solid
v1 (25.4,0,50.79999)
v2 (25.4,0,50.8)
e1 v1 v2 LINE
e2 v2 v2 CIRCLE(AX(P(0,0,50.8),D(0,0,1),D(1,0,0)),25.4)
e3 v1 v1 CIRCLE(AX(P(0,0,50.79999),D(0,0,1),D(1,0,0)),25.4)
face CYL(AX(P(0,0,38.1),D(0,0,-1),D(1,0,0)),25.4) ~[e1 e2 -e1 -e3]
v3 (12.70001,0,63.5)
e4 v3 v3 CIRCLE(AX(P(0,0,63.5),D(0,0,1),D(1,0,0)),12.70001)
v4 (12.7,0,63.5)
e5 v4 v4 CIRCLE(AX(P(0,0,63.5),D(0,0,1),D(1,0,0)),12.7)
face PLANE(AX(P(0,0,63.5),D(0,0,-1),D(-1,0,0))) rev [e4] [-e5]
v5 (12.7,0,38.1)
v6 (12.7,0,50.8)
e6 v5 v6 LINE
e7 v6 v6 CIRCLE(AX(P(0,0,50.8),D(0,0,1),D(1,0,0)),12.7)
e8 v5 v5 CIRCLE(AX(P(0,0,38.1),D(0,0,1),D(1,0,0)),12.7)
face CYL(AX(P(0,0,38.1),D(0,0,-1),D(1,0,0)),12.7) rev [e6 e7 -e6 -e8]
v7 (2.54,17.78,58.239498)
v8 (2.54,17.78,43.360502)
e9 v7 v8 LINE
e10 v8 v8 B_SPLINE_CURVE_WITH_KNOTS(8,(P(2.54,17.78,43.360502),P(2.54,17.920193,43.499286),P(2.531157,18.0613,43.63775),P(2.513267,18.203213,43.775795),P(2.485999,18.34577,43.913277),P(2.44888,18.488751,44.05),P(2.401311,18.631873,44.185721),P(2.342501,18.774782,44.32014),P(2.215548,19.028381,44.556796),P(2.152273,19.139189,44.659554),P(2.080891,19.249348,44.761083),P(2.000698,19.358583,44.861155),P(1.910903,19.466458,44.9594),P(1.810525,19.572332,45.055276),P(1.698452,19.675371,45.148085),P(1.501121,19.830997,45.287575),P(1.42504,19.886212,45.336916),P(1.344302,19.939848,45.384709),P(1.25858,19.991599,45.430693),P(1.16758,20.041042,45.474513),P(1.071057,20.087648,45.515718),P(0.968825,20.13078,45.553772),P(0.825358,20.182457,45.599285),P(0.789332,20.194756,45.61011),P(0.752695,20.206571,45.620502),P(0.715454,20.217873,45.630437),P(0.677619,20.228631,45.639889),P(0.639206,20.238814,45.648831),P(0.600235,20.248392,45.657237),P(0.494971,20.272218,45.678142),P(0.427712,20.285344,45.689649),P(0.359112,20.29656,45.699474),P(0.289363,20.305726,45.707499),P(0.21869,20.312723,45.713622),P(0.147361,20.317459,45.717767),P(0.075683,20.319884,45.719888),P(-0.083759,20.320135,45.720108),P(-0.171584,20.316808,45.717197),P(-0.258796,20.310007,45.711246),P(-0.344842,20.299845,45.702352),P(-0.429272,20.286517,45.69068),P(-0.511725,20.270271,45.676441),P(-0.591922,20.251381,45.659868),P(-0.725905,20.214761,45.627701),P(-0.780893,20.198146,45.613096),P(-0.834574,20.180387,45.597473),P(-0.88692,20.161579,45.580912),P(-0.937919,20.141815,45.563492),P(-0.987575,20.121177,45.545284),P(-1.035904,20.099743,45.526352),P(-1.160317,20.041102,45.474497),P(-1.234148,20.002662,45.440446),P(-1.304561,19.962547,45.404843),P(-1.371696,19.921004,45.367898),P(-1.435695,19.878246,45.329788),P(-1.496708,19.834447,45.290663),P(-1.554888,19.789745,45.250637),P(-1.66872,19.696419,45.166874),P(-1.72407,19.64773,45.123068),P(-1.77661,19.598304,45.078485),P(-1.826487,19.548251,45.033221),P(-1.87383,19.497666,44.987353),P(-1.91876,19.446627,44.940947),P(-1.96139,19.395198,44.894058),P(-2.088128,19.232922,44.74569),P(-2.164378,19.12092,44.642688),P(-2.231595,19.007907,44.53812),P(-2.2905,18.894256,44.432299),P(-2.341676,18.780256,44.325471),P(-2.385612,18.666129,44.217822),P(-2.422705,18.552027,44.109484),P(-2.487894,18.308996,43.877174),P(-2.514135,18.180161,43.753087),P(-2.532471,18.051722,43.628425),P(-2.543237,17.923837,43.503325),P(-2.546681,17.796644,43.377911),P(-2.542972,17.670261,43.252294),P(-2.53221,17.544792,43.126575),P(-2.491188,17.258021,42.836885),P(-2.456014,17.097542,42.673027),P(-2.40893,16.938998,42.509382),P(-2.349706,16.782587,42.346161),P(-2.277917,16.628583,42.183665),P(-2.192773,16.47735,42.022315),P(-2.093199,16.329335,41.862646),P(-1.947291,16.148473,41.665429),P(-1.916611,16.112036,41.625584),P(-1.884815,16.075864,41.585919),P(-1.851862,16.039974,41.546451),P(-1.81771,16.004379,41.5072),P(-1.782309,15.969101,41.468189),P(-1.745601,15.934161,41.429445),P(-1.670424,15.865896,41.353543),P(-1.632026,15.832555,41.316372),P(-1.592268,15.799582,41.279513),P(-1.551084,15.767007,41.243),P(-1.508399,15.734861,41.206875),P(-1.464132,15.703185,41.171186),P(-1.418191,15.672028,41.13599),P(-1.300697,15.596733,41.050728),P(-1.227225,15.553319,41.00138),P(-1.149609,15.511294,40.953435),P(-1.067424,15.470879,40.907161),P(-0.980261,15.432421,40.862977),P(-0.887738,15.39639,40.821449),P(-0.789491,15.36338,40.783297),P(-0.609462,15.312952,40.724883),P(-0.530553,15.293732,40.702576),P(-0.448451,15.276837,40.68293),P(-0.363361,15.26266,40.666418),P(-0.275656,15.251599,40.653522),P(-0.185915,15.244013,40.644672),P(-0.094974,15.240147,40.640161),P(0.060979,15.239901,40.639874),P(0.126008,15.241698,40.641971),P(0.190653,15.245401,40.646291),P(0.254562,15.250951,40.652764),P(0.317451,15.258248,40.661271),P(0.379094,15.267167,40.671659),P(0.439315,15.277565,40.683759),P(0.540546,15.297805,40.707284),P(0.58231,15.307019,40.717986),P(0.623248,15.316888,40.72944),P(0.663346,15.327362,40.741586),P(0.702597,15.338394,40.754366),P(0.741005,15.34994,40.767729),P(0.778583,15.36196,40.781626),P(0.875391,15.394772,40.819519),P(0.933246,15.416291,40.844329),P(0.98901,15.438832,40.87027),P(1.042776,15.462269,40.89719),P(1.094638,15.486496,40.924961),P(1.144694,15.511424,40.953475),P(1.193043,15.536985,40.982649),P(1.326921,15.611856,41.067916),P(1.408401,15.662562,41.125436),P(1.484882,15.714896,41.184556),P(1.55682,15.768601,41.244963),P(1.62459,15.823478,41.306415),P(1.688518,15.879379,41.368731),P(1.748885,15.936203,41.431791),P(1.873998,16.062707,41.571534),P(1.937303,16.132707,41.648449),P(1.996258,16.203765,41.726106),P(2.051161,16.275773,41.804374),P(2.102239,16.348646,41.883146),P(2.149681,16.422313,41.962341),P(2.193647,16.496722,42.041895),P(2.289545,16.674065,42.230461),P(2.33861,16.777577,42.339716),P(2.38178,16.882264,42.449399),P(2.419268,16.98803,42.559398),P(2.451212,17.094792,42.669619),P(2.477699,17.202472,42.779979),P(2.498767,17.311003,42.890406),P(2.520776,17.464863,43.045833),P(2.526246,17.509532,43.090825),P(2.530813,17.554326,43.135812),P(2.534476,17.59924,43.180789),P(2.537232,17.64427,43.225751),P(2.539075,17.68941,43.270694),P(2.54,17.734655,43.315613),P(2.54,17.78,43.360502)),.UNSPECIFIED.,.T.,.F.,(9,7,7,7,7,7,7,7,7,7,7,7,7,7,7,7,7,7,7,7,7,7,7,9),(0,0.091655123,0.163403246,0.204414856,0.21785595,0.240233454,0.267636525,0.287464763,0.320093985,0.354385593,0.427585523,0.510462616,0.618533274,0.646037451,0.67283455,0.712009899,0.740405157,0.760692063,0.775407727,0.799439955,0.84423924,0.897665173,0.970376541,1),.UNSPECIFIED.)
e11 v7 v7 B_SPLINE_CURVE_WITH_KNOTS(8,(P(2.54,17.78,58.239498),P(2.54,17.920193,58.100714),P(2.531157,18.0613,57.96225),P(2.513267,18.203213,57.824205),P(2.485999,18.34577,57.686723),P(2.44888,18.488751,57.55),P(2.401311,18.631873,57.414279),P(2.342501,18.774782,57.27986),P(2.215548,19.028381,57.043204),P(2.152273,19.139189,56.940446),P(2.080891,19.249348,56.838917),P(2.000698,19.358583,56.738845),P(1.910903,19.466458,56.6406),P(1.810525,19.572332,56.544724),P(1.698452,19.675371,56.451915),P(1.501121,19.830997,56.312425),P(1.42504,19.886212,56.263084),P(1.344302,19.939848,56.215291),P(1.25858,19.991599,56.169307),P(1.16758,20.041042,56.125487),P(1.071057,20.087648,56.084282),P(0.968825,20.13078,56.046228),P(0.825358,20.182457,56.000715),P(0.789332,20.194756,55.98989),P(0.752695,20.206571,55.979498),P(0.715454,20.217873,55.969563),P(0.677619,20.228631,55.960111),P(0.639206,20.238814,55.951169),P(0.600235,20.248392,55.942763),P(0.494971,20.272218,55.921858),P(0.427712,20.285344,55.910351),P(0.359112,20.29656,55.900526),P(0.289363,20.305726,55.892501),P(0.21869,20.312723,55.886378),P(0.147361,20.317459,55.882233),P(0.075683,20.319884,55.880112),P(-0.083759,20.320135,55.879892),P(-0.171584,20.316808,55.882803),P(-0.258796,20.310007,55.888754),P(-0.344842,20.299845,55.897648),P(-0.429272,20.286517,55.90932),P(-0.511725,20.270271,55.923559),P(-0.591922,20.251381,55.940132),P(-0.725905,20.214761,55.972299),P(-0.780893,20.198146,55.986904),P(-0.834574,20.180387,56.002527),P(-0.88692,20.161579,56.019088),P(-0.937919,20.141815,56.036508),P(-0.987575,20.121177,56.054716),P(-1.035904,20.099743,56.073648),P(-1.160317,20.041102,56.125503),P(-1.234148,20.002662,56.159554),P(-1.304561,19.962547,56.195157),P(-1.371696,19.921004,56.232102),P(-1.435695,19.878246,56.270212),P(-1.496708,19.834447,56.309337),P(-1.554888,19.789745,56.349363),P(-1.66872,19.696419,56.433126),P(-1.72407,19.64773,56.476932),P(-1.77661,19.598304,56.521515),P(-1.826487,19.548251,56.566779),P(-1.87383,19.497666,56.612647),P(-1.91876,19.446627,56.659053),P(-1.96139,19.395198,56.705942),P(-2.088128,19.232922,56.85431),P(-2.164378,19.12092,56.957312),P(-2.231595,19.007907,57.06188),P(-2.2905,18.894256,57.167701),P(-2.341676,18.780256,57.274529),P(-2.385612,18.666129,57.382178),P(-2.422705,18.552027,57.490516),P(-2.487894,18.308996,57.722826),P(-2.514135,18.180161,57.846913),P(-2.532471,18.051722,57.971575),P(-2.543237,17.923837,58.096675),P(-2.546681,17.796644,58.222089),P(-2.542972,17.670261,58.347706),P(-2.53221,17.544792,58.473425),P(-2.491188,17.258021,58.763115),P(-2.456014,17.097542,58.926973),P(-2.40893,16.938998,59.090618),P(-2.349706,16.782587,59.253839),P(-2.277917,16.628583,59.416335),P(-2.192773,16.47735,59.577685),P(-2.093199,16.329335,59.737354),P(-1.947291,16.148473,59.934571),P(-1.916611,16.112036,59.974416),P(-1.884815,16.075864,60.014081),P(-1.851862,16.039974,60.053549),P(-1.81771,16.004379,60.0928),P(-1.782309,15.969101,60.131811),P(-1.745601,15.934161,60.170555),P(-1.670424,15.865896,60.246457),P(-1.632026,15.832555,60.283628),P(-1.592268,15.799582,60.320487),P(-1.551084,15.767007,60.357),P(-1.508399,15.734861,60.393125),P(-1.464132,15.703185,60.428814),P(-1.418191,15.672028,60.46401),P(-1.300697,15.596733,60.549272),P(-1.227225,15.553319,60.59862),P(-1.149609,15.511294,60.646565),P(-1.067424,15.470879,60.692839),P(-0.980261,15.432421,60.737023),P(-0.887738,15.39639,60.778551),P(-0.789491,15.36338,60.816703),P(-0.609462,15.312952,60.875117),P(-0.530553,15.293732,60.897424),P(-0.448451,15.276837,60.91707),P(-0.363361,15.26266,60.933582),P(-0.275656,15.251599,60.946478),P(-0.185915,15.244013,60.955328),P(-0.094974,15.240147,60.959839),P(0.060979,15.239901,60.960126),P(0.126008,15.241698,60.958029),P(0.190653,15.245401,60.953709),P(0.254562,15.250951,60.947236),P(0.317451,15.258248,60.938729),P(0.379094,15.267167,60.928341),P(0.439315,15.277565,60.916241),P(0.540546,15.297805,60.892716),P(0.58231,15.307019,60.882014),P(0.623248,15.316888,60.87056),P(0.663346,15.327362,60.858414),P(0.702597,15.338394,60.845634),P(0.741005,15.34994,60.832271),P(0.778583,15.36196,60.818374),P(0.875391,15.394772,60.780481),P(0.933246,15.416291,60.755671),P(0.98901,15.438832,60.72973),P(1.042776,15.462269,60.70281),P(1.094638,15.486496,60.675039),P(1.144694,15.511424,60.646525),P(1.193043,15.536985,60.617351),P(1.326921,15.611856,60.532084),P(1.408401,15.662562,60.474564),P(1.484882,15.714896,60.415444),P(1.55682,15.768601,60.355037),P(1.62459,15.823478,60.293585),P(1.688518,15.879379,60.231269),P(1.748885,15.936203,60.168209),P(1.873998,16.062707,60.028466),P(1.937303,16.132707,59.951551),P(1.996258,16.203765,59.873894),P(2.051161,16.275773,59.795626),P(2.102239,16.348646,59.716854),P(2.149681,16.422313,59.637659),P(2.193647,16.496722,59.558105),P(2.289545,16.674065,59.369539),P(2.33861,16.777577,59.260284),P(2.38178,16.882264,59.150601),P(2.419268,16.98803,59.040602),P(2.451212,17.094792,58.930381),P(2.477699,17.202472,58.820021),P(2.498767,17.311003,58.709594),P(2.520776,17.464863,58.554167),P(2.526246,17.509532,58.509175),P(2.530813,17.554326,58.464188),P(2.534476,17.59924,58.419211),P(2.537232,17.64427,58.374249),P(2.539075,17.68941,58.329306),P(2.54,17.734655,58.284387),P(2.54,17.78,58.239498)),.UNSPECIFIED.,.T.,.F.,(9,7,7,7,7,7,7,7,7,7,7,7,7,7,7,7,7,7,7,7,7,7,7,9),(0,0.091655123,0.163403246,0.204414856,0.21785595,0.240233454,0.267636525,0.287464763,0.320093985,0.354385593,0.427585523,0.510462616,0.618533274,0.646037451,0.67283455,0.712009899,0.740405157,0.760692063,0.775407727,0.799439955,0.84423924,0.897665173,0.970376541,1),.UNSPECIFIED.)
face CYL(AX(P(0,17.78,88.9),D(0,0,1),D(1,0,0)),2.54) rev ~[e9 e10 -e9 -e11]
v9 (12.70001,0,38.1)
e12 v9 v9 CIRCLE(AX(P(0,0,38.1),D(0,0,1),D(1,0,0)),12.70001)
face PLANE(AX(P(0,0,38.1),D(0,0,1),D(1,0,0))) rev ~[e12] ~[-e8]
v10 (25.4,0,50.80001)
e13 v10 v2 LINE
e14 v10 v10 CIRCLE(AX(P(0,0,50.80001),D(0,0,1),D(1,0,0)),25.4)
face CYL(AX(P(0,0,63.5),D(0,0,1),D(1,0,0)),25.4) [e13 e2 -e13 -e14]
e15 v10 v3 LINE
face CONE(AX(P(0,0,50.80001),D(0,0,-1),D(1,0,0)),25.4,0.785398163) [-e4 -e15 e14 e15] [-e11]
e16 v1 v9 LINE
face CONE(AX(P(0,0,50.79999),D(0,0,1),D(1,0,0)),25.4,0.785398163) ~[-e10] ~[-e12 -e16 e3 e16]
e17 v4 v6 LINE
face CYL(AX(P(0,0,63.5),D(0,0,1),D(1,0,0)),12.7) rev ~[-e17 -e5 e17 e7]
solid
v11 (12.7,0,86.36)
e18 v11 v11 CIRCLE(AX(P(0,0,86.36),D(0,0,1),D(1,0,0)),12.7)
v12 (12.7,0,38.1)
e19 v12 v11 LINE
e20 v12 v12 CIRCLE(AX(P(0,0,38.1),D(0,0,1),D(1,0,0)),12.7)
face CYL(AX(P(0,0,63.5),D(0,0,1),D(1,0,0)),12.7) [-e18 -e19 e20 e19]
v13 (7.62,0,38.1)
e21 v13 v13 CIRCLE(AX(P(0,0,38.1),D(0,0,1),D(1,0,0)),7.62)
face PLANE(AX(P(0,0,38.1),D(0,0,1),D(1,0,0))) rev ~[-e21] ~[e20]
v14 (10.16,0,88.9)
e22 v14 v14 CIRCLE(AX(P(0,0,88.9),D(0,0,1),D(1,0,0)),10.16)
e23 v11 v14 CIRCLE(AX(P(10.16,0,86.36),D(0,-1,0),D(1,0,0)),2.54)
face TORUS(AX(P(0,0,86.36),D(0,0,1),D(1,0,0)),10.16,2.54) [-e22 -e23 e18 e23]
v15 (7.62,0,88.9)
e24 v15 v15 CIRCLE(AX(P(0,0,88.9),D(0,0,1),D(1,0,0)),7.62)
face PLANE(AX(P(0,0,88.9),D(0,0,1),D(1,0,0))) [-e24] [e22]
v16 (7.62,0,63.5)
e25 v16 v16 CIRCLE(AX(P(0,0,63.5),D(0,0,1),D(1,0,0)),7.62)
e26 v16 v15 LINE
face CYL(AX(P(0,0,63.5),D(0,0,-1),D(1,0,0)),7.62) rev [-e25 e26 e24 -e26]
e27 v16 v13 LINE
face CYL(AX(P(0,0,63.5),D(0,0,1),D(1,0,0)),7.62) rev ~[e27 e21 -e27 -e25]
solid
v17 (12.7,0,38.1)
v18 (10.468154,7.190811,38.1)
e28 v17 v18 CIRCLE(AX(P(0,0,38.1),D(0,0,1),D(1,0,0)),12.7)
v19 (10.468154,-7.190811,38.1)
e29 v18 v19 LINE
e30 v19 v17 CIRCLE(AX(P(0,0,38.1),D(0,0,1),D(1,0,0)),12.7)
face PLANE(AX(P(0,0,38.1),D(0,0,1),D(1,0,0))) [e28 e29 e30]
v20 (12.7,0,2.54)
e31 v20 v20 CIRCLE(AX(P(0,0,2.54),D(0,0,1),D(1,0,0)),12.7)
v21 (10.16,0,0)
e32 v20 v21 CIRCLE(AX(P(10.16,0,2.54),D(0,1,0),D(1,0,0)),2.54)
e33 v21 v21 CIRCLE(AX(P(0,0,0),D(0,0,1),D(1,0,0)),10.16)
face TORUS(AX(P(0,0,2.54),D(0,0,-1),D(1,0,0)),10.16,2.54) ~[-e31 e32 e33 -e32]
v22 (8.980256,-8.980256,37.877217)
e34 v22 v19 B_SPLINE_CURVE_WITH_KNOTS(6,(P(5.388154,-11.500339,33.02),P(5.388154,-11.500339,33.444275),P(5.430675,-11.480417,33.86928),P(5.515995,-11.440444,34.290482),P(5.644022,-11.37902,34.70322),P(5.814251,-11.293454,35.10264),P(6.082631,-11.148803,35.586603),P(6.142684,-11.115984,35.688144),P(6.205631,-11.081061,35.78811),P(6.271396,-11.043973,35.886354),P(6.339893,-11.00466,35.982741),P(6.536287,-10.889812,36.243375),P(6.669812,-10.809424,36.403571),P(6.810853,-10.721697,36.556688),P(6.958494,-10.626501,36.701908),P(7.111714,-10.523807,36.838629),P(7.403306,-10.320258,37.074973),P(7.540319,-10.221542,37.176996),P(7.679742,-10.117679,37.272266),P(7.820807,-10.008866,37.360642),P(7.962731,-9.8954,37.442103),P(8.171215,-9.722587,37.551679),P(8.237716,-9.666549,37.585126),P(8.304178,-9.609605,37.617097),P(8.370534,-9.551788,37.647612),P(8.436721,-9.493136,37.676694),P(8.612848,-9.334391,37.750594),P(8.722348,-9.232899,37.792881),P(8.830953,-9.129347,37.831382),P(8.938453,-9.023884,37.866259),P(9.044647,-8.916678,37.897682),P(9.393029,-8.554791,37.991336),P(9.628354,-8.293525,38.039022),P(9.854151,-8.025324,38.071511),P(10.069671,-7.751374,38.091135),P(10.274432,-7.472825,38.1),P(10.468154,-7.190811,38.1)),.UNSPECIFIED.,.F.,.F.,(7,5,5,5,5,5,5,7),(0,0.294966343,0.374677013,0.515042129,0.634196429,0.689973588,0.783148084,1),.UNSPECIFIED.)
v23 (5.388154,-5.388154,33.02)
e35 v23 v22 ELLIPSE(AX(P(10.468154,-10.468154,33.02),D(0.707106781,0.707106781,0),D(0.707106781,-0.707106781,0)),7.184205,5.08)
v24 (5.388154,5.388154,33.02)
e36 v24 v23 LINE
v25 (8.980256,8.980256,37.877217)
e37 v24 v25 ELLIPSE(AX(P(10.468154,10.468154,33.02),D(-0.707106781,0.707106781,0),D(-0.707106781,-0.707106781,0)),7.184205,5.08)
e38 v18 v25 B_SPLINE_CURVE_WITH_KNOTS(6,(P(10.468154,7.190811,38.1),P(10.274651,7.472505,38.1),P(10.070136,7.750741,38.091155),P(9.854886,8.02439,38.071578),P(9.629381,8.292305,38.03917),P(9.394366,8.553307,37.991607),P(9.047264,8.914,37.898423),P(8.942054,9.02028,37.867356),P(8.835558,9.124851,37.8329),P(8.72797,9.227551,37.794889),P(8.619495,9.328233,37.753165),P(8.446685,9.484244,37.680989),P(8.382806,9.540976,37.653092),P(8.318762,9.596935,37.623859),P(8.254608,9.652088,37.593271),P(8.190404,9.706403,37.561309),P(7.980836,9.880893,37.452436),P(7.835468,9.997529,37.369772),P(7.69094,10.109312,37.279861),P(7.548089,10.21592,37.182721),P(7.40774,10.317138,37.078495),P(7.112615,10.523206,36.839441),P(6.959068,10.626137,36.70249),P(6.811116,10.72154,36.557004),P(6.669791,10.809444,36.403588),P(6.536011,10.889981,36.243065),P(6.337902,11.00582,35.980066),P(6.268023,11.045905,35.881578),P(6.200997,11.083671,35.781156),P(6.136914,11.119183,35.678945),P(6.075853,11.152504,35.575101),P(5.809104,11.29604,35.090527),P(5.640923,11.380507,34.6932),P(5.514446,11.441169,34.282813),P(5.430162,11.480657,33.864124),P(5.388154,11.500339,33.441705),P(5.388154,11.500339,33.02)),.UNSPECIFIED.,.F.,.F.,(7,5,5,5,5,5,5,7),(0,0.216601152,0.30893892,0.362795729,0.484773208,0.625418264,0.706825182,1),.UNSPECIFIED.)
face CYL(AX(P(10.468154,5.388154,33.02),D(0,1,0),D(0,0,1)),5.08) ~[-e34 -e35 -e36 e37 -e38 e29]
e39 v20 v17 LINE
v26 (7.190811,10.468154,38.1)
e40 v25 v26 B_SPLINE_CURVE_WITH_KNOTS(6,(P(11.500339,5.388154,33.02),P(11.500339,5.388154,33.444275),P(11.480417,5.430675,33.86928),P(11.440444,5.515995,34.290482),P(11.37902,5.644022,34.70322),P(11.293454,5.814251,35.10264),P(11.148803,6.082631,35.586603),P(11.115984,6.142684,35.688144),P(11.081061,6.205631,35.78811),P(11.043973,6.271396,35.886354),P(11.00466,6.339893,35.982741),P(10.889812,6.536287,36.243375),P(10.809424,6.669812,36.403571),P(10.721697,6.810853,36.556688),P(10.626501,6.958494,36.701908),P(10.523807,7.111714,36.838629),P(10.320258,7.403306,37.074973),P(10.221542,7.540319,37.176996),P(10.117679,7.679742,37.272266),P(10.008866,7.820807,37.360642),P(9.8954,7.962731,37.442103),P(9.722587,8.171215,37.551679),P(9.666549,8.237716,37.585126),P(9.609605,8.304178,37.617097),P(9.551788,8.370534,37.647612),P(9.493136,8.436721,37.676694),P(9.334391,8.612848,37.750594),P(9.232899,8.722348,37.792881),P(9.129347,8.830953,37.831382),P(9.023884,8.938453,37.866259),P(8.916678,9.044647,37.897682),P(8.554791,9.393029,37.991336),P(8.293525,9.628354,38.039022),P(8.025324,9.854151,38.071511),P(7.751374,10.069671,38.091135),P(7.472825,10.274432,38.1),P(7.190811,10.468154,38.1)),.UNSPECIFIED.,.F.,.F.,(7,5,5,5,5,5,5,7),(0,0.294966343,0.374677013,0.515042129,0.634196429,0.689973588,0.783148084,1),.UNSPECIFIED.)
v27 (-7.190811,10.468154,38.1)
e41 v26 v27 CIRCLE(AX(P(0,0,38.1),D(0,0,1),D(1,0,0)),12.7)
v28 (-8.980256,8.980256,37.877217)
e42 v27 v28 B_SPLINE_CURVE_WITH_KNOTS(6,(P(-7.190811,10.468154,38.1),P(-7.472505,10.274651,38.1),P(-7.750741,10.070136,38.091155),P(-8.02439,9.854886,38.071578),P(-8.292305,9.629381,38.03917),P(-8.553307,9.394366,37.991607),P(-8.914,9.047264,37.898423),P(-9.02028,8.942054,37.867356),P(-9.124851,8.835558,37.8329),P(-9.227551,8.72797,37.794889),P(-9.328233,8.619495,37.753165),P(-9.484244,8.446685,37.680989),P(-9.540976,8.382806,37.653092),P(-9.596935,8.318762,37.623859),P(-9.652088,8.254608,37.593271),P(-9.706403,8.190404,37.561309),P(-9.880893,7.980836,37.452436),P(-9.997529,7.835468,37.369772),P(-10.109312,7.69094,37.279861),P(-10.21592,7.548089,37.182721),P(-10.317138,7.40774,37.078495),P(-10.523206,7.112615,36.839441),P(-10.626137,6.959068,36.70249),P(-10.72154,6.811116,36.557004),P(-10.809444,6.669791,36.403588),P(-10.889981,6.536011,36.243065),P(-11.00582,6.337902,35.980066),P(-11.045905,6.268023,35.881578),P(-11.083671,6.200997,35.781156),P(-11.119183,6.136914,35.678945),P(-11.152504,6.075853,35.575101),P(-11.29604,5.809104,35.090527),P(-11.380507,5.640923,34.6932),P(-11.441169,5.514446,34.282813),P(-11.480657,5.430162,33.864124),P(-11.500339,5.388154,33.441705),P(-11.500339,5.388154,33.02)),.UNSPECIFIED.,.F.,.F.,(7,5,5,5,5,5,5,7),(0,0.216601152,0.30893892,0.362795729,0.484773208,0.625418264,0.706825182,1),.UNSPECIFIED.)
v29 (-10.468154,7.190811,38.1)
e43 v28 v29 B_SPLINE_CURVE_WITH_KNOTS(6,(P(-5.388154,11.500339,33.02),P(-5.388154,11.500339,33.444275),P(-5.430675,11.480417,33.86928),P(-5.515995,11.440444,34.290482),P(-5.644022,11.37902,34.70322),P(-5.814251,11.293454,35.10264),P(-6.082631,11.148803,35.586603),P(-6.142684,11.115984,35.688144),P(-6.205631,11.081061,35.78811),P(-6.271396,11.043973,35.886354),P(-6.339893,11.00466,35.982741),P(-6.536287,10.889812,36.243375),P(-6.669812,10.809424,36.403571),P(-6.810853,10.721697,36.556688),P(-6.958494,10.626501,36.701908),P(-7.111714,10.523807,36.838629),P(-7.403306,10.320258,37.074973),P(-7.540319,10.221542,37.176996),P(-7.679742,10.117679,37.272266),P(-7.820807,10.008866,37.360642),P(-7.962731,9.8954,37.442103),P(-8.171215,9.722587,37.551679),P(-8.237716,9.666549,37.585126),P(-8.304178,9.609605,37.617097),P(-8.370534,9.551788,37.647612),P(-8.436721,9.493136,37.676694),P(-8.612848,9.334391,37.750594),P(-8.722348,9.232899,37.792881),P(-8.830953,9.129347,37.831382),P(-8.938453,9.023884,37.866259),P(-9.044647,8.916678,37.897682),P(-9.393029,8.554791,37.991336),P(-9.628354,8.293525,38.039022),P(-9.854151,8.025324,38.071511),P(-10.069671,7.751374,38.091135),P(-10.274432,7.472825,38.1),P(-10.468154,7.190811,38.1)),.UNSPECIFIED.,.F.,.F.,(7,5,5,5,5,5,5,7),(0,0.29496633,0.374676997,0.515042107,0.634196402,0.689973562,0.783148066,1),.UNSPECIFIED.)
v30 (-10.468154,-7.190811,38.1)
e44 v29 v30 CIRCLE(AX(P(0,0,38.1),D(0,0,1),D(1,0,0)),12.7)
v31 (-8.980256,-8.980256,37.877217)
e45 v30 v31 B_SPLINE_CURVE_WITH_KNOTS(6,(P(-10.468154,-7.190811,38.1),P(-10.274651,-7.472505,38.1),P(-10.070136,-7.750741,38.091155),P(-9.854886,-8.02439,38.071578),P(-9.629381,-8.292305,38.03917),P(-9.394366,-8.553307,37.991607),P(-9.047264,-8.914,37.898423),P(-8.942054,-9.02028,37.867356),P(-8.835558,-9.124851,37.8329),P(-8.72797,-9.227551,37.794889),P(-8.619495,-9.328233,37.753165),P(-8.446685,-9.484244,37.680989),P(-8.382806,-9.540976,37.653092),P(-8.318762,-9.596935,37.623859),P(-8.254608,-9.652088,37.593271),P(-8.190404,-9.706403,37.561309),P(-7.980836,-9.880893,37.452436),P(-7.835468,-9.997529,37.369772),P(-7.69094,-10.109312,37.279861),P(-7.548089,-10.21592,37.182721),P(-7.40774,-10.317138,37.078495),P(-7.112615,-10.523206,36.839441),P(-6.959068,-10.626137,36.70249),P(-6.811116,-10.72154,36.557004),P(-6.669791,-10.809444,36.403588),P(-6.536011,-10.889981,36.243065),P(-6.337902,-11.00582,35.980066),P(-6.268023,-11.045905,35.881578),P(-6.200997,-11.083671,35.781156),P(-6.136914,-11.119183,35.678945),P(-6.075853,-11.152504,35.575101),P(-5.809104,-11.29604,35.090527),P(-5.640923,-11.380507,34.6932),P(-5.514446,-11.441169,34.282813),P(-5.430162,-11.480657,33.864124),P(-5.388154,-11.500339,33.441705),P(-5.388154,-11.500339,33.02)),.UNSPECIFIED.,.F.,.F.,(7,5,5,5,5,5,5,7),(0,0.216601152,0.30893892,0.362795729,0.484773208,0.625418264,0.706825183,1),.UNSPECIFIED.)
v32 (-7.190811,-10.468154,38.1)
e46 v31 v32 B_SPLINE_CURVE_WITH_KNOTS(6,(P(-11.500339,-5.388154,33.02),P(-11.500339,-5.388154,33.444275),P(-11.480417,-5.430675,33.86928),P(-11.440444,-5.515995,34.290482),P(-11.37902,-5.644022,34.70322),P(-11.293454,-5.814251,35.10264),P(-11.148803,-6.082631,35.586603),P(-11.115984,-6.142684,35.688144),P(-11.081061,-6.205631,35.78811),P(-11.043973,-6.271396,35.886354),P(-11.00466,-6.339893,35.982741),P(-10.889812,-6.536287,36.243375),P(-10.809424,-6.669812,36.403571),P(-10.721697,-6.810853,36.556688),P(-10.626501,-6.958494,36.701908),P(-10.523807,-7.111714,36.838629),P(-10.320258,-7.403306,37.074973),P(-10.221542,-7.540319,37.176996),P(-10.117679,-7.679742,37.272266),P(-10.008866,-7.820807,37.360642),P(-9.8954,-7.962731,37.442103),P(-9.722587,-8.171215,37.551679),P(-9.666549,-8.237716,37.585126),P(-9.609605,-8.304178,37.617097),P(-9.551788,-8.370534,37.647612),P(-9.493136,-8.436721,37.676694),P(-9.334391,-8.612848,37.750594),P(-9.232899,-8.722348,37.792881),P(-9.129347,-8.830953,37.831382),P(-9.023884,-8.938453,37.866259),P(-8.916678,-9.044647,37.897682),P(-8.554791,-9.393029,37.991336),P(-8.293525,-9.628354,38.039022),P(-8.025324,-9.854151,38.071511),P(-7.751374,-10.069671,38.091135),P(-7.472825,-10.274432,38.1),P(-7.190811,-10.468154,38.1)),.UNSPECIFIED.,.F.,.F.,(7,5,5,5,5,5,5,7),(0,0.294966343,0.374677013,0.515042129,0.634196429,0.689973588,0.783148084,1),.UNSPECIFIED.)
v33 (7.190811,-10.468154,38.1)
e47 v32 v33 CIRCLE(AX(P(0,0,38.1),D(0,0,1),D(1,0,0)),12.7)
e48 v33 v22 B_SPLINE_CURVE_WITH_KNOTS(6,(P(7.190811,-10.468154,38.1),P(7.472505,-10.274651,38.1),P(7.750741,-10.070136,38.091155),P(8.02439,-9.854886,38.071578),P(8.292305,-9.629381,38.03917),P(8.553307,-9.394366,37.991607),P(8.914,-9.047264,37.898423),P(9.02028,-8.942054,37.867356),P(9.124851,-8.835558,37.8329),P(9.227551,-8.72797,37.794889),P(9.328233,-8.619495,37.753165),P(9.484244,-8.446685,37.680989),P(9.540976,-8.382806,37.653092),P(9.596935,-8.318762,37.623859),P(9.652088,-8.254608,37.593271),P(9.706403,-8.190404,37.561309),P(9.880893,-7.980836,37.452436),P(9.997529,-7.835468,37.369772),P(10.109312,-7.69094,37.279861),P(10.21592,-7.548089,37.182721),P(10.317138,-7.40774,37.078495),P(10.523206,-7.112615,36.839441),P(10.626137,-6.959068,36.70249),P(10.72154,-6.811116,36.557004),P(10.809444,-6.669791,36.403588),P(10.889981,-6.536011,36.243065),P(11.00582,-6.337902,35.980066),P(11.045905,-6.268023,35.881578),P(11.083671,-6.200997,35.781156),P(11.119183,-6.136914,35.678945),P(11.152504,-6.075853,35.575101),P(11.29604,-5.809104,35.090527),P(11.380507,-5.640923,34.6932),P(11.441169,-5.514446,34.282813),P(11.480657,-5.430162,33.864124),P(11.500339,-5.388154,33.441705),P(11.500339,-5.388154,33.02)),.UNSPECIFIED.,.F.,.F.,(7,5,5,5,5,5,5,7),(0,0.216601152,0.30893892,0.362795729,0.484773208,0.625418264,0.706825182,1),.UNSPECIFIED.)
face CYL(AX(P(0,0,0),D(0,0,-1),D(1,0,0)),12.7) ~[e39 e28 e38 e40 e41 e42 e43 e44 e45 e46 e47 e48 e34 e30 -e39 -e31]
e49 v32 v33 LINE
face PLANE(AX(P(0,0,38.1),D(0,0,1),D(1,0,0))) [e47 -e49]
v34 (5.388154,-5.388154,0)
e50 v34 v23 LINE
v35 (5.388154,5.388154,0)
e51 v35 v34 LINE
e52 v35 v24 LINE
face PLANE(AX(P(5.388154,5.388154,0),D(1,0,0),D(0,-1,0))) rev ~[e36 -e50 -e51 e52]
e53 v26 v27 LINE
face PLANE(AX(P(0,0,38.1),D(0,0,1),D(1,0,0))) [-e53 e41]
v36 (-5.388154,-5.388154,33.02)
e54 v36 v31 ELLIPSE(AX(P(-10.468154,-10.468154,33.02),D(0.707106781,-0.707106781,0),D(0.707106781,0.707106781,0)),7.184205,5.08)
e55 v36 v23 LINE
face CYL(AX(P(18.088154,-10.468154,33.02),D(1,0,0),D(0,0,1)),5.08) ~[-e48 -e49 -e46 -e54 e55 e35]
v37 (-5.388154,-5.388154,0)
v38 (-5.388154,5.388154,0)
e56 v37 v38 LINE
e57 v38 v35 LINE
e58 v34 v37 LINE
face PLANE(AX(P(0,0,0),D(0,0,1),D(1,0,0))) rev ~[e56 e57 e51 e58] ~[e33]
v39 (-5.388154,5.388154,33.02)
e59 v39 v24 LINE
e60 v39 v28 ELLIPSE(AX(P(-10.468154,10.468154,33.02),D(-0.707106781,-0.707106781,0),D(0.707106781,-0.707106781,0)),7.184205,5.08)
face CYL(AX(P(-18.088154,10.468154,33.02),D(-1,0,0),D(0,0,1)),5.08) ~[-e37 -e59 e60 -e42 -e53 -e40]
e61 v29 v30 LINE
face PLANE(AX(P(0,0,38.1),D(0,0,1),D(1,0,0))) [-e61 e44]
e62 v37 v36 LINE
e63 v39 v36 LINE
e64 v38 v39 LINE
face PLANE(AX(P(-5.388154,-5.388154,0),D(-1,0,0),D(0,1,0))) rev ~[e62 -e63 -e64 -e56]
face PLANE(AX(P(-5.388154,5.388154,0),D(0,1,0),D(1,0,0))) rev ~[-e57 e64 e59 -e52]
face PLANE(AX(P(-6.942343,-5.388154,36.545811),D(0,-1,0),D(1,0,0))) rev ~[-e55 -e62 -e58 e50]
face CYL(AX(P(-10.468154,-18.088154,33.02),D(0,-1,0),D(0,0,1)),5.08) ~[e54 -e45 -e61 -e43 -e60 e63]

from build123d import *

# Parameters (mm, degrees)
F0_R         = 12.7
F1_DEPTH     = 38.1
F2_R         = 25.4
F2_R_2       = 12.7
F3_DEPTH     = 12.7
F4_R         = 2.54
F5_T1_DEPTH  = 10.7763073453
F5_T3_DEPTH  = 10.7763073453
F5_T9_DEPTH  = 23.4763073453
F5_S10_R     = 12.7
F5_T11_DEPTH = 14
F5_T15_DEPTH = 23.4763073453
F5_S16_R     = 12.7
F5_T17_DEPTH = 14
F5_T24_DEPTH = 23.4763073453
F5_S25_R     = 12.7
F5_T26_DEPTH = 14
F5_T30_DEPTH = 23.4763073453
F5_S31_R     = 12.7
F5_T32_DEPTH = 14
F5_T39_DEPTH = 23.4763073453
F5_S40_R     = 12.7
F5_T41_DEPTH = 14
F5_T45_DEPTH = 23.4763073453
F5_S46_R     = 12.7
F5_T47_DEPTH = 14
F5_T54_DEPTH = 23.4763073453
F5_S55_R     = 12.7
F5_T56_DEPTH = 14
F5_T60_DEPTH = 23.4763073453
F5_S61_R     = 12.7
F5_T62_DEPTH = 14
F8_R         = 12.7
F8_R_2       = 7.62
F9_DEPTH     = 25.4
F10_R        = 2.54
F11_DEPTH    = 25.4
F12_SIZE     = 12.69999
F13_R        = 2.54
F14_DEPTH    = 152.4


# Not quite as in the source:
# - a fillet or chamfer that OpenCascade refuses, or shapes differently, is made with other operations: its cross-section is extruded or revolved along the edge and cut away or added
# - a fillet or chamfer is up to 0.001 mm smaller than in the source, because OpenCascade refuses the exact size


with BuildPart() as f1:
    # F0 (on Top) → F1 (new body)
    with BuildSketch(Plane.XY):
        Circle(F0_R)
        with BuildLine():
            ThreePointArc((5.3881536726, 5.3881536726), (7.0399620377, 2.9160477546), (7.62, 0))
            ThreePointArc((7.62, 0), (7.0399620377, -2.9160477546), (5.3881536726, -5.3881536726))
            ThreePointArc((5.3881536726, -5.3881536726), (0, -7.62), (-5.3881536726, -5.3881536726))
            ThreePointArc((-5.3881536726, -5.3881536726), (-7.62, 0), (-5.3881536726, 5.3881536726))
            ThreePointArc((-5.3881536726, 5.3881536726), (0, 7.62), (5.3881536726, 5.3881536726))
        make_face(mode=Mode.SUBTRACT)
        with BuildLine():
            ThreePointArc((-5.3881536726, -5.3881536726), (0, -7.62), (5.3881536726, -5.3881536726))
            Line((5.3881536726, -5.3881536726), (-5.3881536726, -5.3881536726))
        make_face()
        with BuildLine():
            Line((-5.3881536726, -5.3881536726), (-5.3881536726, 5.3881536726))
            ThreePointArc((-5.3881536726, 5.3881536726), (-7.62, 0), (-5.3881536726, -5.3881536726))
        make_face()
        with BuildLine():
            ThreePointArc((5.3881536726, -5.3881536726), (7.0399620377, -2.9160477546), (7.62, 0))
            ThreePointArc((7.62, 0), (7.0399620377, 2.9160477546), (5.3881536726, 5.3881536726))
            Line((5.3881536726, 5.3881536726), (5.3881536726, -5.3881536726))
        make_face()
        with BuildLine():
            Line((-5.3881536726, 5.3881536726), (5.3881536726, 5.3881536726))
            ThreePointArc((5.3881536726, 5.3881536726), (0, 7.62), (-5.3881536726, 5.3881536726))
        make_face()
    extrude(amount=F1_DEPTH)

    # F4
    f4_edges = [f1.edges().sort_by_distance(p)[0] for p in [
        (-12.7, 0, 0),
    ]]
    fillet(f4_edges, radius=F4_R)

    # F5: fillet of radius 5.08 on 4 edges, made by hand

    # F5_s2 → F5_t1 (cut)
    with BuildSketch(Plane.XZ.offset(-5.3881536726)):
        with BuildLine():
            ThreePointArc((10.4681536726, 38.1), (6.8760512242, 36.6121024484), (5.3881536726, 33.02))
            Line((5.3881536726, 33.02), (5.3881536726, 38.1))
            Line((5.3881536726, 38.1), (10.4681536726, 38.1))
        make_face()
        with BuildLine():
            ThreePointArc((-10.4681536726, 38.1), (-6.8760512242, 36.6121024484), (-5.3881536726, 33.02))
            Line((-5.3881536726, 33.02), (-5.3881536726, 38.1))
            Line((-5.3881536726, 38.1), (-10.4681536726, 38.1))
        make_face()
    extrude(amount=F5_T1_DEPTH, mode=Mode.SUBTRACT)

    # F5_s4 → F5_t3 (cut)
    with BuildSketch(Plane.YZ.offset(-5.3881536726)):
        with BuildLine():
            ThreePointArc((-10.4681536726, 38.1), (-6.8760512242, 36.6121024484), (-5.3881536726, 33.02))
            Line((-5.3881536726, 33.02), (-5.3881536726, 38.1))
            Line((-5.3881536726, 38.1), (-10.4681536726, 38.1))
        make_face()
        with BuildLine():
            ThreePointArc((10.4681536726, 38.1), (6.8760512242, 36.6121024484), (5.3881536726, 33.02))
            Line((5.3881536726, 33.02), (5.3881536726, 38.1))
            Line((5.3881536726, 38.1), (10.4681536726, 38.1))
        make_face()
    extrude(amount=F5_T3_DEPTH, mode=Mode.SUBTRACT)


with BuildPart() as f3:
    # F2 (on face) → F3 (new body)
    with BuildSketch(Plane.XY.offset(38.1)):
        Circle(F2_R)
        Circle(F2_R_2, mode=Mode.SUBTRACT)
    extrude(amount=F3_DEPTH)

    # F6: F3 across face


with BuildPart() as f5_tool7:
    # F5_s8 → F5_t9 (new body)
    with BuildSketch(Plane.YZ.offset(-5.3881536726)):
        with BuildLine():
            ThreePointArc((10.4681536726, 38.1), (6.8760512242, 36.6121024484), (5.3881536726, 33.02))
            Line((5.3881536726, 33.02), (5.3881536726, 38.1))
            Line((5.3881536726, 38.1), (10.4681536726, 38.1))
        make_face()
    extrude(amount=F5_T9_DEPTH)

    # F5_s10 → F5_t11 (intersect, symmetric)
    with BuildSketch(Plane.XY.offset(35.6)):
        Circle(F5_S10_R)
    extrude(amount=F5_T11_DEPTH, both=True, mode=Mode.INTERSECT)

    split(bisect_by=Plane.YZ.offset(5.3881536726), keep=Keep.TOP)


with BuildPart() as f5_tool13:
    # F5_s14 → F5_t15 (new body)
    with BuildSketch(Plane.XZ.offset(-18.0881536726)):
        with BuildLine():
            ThreePointArc((10.4681536726, 38.1), (6.8760512242, 36.6121024484), (5.3881536726, 33.02))
            Line((5.3881536726, 33.02), (5.3881536726, 38.1))
            Line((5.3881536726, 38.1), (10.4681536726, 38.1))
        make_face()
    extrude(amount=F5_T15_DEPTH)

    # F5_s16 → F5_t17 (intersect, symmetric)
    with BuildSketch(Plane.XY.offset(35.6)):
        Circle(F5_S16_R)
    extrude(amount=F5_T17_DEPTH, both=True, mode=Mode.INTERSECT)

    split(bisect_by=Plane.XZ.offset(-5.3881536726), keep=Keep.BOTTOM)


with BuildPart() as f5_tool7_1:
    add(f5_tool7.part)

    # F5_t19: intersect F5_tool13
    add(f5_tool13.part, mode=Mode.INTERSECT)


with BuildPart() as f1_1:
    add(f1.part)

    # F5_t5: cut F5_tool7
    add(f5_tool7_1.part, mode=Mode.SUBTRACT)


with BuildPart() as f5_tool22:
    # F5_s23 → F5_t24 (new body)
    with BuildSketch(Plane.YZ.offset(18.0881536726)):
        with BuildLine():
            ThreePointArc((-10.4681536726, 38.1), (-6.8760512242, 36.6121024484), (-5.3881536726, 33.02))
            Line((-5.3881536726, 33.02), (-5.3881536726, 38.1))
            Line((-5.3881536726, 38.1), (-10.4681536726, 38.1))
        make_face()
    extrude(amount=-F5_T24_DEPTH)

    # F5_s25 → F5_t26 (intersect, symmetric)
    with BuildSketch(Plane.XY.offset(35.6)):
        Circle(F5_S25_R)
    extrude(amount=F5_T26_DEPTH, both=True, mode=Mode.INTERSECT)

    split(bisect_by=Plane.YZ.offset(5.3881536726), keep=Keep.TOP)


with BuildPart() as f5_tool28:
    # F5_s29 → F5_t30 (new body)
    with BuildSketch(Plane.XZ.offset(-5.3881536726)):
        with BuildLine():
            ThreePointArc((10.4681536726, 38.1), (6.8760512242, 36.6121024484), (5.3881536726, 33.02))
            Line((5.3881536726, 33.02), (5.3881536726, 38.1))
            Line((5.3881536726, 38.1), (10.4681536726, 38.1))
        make_face()
    extrude(amount=F5_T30_DEPTH)

    # F5_s31 → F5_t32 (intersect, symmetric)
    with BuildSketch(Plane.XY.offset(35.6)):
        Circle(F5_S31_R)
    extrude(amount=F5_T32_DEPTH, both=True, mode=Mode.INTERSECT)

    split(bisect_by=Plane.XZ.offset(5.3881536726), keep=Keep.TOP)


with BuildPart() as f5_tool22_1:
    add(f5_tool22.part)

    # F5_t34: intersect F5_tool28
    add(f5_tool28.part, mode=Mode.INTERSECT)


with BuildPart() as f1_2:
    add(f1_1.part)

    # F5_t20: cut F5_tool22
    add(f5_tool22_1.part, mode=Mode.SUBTRACT)


with BuildPart() as f5_tool37:
    # F5_s38 → F5_t39 (new body)
    with BuildSketch(Plane.YZ.offset(5.3881536726)):
        with BuildLine():
            ThreePointArc((-10.4681536726, 38.1), (-6.8760512242, 36.6121024484), (-5.3881536726, 33.02))
            Line((-5.3881536726, 33.02), (-5.3881536726, 38.1))
            Line((-5.3881536726, 38.1), (-10.4681536726, 38.1))
        make_face()
    extrude(amount=-F5_T39_DEPTH)

    # F5_s40 → F5_t41 (intersect, symmetric)
    with BuildSketch(Plane.XY.offset(35.6)):
        Circle(F5_S40_R)
    extrude(amount=F5_T41_DEPTH, both=True, mode=Mode.INTERSECT)

    split(bisect_by=Plane.YZ.offset(-5.3881536726), keep=Keep.BOTTOM)


with BuildPart() as f5_tool43:
    # F5_s44 → F5_t45 (new body)
    with BuildSketch(Plane.XZ.offset(18.0881536726)):
        with BuildLine():
            ThreePointArc((-10.4681536726, 38.1), (-6.8760512242, 36.6121024484), (-5.3881536726, 33.02))
            Line((-5.3881536726, 33.02), (-5.3881536726, 38.1))
            Line((-5.3881536726, 38.1), (-10.4681536726, 38.1))
        make_face()
    extrude(amount=-F5_T45_DEPTH)

    # F5_s46 → F5_t47 (intersect, symmetric)
    with BuildSketch(Plane.XY.offset(35.6)):
        Circle(F5_S46_R)
    extrude(amount=F5_T47_DEPTH, both=True, mode=Mode.INTERSECT)

    split(bisect_by=Plane.XZ.offset(5.3881536726), keep=Keep.TOP)


with BuildPart() as f5_tool37_1:
    add(f5_tool37.part)

    # F5_t49: intersect F5_tool43
    add(f5_tool43.part, mode=Mode.INTERSECT)


with BuildPart() as f1_3:
    add(f1_2.part)

    # F5_t35: cut F5_tool37
    add(f5_tool37_1.part, mode=Mode.SUBTRACT)


with BuildPart() as f5_tool52:
    # F5_s53 → F5_t54 (new body)
    with BuildSketch(Plane.XZ.offset(5.3881536726)):
        with BuildLine():
            ThreePointArc((-10.4681536726, 38.1), (-6.8760512242, 36.6121024484), (-5.3881536726, 33.02))
            Line((-5.3881536726, 33.02), (-5.3881536726, 38.1))
            Line((-5.3881536726, 38.1), (-10.4681536726, 38.1))
        make_face()
    extrude(amount=-F5_T54_DEPTH)

    # F5_s55 → F5_t56 (intersect, symmetric)
    with BuildSketch(Plane.XY.offset(35.6)):
        Circle(F5_S55_R)
    extrude(amount=F5_T56_DEPTH, both=True, mode=Mode.INTERSECT)

    split(bisect_by=Plane.XZ.offset(-5.3881536726), keep=Keep.BOTTOM)


with BuildPart() as f5_tool58:
    # F5_s59 → F5_t60 (new body)
    with BuildSketch(Plane.YZ.offset(-18.0881536726)):
        with BuildLine():
            ThreePointArc((10.4681536726, 38.1), (6.8760512242, 36.6121024484), (5.3881536726, 33.02))
            Line((5.3881536726, 33.02), (5.3881536726, 38.1))
            Line((5.3881536726, 38.1), (10.4681536726, 38.1))
        make_face()
    extrude(amount=F5_T60_DEPTH)

    # F5_s61 → F5_t62 (intersect, symmetric)
    with BuildSketch(Plane.XY.offset(35.6)):
        Circle(F5_S61_R)
    extrude(amount=F5_T62_DEPTH, both=True, mode=Mode.INTERSECT)

    split(bisect_by=Plane.YZ.offset(-5.3881536726), keep=Keep.BOTTOM)


with BuildPart() as f5_tool52_1:
    add(f5_tool52.part)

    # F5_t64: intersect F5_tool58
    add(f5_tool58.part, mode=Mode.INTERSECT)


with BuildPart() as f1_4:
    add(f1_3.part)

    # F5_t50: cut F5_tool52
    add(f5_tool52_1.part, mode=Mode.SUBTRACT)


with BuildPart() as f3_1:
    add(f3.part)
    add(f3.part.mirror(Plane.XY.offset(50.8)))

    # F12 (size 12.7 in the source; OpenCascade refuses exactly that, so slightly less here)
    f12_edges = [f3_1.edges().sort_by_distance(p)[0] for p in [
        (-25.4, 0, 38.1),
        (-25.4, 0, 63.5),
    ]]
    chamfer(f12_edges, length=F12_SIZE)

    # F13 (on face) → F14 (cut)
    with BuildSketch(Plane.XY.offset(88.9)):
        with Locations((0, 17.78)):
            Circle(F13_R)
    extrude(amount=-F14_DEPTH, mode=Mode.SUBTRACT)


with BuildPart() as f9:
    # F8 (on offset) → F9 (new body)
    with BuildSketch(Plane.XY.offset(63.5)):
        Circle(F8_R)
        Circle(F8_R_2, mode=Mode.SUBTRACT)
    extrude(amount=F9_DEPTH)

    # F10
    f10_edges = [f9.edges().sort_by_distance(p)[0] for p in [
        (-12.7, 0, 88.9),
    ]]
    fillet(f10_edges, radius=F10_R)

    # F8 (on offset) → F11 (join)
    with BuildSketch(Plane.XY.offset(63.5)):
        Circle(F8_R)
        Circle(F8_R_2, mode=Mode.SUBTRACT)
    extrude(amount=-F11_DEPTH)


solid = Compound([f1_4.part, f3_1.part, f9.part])
